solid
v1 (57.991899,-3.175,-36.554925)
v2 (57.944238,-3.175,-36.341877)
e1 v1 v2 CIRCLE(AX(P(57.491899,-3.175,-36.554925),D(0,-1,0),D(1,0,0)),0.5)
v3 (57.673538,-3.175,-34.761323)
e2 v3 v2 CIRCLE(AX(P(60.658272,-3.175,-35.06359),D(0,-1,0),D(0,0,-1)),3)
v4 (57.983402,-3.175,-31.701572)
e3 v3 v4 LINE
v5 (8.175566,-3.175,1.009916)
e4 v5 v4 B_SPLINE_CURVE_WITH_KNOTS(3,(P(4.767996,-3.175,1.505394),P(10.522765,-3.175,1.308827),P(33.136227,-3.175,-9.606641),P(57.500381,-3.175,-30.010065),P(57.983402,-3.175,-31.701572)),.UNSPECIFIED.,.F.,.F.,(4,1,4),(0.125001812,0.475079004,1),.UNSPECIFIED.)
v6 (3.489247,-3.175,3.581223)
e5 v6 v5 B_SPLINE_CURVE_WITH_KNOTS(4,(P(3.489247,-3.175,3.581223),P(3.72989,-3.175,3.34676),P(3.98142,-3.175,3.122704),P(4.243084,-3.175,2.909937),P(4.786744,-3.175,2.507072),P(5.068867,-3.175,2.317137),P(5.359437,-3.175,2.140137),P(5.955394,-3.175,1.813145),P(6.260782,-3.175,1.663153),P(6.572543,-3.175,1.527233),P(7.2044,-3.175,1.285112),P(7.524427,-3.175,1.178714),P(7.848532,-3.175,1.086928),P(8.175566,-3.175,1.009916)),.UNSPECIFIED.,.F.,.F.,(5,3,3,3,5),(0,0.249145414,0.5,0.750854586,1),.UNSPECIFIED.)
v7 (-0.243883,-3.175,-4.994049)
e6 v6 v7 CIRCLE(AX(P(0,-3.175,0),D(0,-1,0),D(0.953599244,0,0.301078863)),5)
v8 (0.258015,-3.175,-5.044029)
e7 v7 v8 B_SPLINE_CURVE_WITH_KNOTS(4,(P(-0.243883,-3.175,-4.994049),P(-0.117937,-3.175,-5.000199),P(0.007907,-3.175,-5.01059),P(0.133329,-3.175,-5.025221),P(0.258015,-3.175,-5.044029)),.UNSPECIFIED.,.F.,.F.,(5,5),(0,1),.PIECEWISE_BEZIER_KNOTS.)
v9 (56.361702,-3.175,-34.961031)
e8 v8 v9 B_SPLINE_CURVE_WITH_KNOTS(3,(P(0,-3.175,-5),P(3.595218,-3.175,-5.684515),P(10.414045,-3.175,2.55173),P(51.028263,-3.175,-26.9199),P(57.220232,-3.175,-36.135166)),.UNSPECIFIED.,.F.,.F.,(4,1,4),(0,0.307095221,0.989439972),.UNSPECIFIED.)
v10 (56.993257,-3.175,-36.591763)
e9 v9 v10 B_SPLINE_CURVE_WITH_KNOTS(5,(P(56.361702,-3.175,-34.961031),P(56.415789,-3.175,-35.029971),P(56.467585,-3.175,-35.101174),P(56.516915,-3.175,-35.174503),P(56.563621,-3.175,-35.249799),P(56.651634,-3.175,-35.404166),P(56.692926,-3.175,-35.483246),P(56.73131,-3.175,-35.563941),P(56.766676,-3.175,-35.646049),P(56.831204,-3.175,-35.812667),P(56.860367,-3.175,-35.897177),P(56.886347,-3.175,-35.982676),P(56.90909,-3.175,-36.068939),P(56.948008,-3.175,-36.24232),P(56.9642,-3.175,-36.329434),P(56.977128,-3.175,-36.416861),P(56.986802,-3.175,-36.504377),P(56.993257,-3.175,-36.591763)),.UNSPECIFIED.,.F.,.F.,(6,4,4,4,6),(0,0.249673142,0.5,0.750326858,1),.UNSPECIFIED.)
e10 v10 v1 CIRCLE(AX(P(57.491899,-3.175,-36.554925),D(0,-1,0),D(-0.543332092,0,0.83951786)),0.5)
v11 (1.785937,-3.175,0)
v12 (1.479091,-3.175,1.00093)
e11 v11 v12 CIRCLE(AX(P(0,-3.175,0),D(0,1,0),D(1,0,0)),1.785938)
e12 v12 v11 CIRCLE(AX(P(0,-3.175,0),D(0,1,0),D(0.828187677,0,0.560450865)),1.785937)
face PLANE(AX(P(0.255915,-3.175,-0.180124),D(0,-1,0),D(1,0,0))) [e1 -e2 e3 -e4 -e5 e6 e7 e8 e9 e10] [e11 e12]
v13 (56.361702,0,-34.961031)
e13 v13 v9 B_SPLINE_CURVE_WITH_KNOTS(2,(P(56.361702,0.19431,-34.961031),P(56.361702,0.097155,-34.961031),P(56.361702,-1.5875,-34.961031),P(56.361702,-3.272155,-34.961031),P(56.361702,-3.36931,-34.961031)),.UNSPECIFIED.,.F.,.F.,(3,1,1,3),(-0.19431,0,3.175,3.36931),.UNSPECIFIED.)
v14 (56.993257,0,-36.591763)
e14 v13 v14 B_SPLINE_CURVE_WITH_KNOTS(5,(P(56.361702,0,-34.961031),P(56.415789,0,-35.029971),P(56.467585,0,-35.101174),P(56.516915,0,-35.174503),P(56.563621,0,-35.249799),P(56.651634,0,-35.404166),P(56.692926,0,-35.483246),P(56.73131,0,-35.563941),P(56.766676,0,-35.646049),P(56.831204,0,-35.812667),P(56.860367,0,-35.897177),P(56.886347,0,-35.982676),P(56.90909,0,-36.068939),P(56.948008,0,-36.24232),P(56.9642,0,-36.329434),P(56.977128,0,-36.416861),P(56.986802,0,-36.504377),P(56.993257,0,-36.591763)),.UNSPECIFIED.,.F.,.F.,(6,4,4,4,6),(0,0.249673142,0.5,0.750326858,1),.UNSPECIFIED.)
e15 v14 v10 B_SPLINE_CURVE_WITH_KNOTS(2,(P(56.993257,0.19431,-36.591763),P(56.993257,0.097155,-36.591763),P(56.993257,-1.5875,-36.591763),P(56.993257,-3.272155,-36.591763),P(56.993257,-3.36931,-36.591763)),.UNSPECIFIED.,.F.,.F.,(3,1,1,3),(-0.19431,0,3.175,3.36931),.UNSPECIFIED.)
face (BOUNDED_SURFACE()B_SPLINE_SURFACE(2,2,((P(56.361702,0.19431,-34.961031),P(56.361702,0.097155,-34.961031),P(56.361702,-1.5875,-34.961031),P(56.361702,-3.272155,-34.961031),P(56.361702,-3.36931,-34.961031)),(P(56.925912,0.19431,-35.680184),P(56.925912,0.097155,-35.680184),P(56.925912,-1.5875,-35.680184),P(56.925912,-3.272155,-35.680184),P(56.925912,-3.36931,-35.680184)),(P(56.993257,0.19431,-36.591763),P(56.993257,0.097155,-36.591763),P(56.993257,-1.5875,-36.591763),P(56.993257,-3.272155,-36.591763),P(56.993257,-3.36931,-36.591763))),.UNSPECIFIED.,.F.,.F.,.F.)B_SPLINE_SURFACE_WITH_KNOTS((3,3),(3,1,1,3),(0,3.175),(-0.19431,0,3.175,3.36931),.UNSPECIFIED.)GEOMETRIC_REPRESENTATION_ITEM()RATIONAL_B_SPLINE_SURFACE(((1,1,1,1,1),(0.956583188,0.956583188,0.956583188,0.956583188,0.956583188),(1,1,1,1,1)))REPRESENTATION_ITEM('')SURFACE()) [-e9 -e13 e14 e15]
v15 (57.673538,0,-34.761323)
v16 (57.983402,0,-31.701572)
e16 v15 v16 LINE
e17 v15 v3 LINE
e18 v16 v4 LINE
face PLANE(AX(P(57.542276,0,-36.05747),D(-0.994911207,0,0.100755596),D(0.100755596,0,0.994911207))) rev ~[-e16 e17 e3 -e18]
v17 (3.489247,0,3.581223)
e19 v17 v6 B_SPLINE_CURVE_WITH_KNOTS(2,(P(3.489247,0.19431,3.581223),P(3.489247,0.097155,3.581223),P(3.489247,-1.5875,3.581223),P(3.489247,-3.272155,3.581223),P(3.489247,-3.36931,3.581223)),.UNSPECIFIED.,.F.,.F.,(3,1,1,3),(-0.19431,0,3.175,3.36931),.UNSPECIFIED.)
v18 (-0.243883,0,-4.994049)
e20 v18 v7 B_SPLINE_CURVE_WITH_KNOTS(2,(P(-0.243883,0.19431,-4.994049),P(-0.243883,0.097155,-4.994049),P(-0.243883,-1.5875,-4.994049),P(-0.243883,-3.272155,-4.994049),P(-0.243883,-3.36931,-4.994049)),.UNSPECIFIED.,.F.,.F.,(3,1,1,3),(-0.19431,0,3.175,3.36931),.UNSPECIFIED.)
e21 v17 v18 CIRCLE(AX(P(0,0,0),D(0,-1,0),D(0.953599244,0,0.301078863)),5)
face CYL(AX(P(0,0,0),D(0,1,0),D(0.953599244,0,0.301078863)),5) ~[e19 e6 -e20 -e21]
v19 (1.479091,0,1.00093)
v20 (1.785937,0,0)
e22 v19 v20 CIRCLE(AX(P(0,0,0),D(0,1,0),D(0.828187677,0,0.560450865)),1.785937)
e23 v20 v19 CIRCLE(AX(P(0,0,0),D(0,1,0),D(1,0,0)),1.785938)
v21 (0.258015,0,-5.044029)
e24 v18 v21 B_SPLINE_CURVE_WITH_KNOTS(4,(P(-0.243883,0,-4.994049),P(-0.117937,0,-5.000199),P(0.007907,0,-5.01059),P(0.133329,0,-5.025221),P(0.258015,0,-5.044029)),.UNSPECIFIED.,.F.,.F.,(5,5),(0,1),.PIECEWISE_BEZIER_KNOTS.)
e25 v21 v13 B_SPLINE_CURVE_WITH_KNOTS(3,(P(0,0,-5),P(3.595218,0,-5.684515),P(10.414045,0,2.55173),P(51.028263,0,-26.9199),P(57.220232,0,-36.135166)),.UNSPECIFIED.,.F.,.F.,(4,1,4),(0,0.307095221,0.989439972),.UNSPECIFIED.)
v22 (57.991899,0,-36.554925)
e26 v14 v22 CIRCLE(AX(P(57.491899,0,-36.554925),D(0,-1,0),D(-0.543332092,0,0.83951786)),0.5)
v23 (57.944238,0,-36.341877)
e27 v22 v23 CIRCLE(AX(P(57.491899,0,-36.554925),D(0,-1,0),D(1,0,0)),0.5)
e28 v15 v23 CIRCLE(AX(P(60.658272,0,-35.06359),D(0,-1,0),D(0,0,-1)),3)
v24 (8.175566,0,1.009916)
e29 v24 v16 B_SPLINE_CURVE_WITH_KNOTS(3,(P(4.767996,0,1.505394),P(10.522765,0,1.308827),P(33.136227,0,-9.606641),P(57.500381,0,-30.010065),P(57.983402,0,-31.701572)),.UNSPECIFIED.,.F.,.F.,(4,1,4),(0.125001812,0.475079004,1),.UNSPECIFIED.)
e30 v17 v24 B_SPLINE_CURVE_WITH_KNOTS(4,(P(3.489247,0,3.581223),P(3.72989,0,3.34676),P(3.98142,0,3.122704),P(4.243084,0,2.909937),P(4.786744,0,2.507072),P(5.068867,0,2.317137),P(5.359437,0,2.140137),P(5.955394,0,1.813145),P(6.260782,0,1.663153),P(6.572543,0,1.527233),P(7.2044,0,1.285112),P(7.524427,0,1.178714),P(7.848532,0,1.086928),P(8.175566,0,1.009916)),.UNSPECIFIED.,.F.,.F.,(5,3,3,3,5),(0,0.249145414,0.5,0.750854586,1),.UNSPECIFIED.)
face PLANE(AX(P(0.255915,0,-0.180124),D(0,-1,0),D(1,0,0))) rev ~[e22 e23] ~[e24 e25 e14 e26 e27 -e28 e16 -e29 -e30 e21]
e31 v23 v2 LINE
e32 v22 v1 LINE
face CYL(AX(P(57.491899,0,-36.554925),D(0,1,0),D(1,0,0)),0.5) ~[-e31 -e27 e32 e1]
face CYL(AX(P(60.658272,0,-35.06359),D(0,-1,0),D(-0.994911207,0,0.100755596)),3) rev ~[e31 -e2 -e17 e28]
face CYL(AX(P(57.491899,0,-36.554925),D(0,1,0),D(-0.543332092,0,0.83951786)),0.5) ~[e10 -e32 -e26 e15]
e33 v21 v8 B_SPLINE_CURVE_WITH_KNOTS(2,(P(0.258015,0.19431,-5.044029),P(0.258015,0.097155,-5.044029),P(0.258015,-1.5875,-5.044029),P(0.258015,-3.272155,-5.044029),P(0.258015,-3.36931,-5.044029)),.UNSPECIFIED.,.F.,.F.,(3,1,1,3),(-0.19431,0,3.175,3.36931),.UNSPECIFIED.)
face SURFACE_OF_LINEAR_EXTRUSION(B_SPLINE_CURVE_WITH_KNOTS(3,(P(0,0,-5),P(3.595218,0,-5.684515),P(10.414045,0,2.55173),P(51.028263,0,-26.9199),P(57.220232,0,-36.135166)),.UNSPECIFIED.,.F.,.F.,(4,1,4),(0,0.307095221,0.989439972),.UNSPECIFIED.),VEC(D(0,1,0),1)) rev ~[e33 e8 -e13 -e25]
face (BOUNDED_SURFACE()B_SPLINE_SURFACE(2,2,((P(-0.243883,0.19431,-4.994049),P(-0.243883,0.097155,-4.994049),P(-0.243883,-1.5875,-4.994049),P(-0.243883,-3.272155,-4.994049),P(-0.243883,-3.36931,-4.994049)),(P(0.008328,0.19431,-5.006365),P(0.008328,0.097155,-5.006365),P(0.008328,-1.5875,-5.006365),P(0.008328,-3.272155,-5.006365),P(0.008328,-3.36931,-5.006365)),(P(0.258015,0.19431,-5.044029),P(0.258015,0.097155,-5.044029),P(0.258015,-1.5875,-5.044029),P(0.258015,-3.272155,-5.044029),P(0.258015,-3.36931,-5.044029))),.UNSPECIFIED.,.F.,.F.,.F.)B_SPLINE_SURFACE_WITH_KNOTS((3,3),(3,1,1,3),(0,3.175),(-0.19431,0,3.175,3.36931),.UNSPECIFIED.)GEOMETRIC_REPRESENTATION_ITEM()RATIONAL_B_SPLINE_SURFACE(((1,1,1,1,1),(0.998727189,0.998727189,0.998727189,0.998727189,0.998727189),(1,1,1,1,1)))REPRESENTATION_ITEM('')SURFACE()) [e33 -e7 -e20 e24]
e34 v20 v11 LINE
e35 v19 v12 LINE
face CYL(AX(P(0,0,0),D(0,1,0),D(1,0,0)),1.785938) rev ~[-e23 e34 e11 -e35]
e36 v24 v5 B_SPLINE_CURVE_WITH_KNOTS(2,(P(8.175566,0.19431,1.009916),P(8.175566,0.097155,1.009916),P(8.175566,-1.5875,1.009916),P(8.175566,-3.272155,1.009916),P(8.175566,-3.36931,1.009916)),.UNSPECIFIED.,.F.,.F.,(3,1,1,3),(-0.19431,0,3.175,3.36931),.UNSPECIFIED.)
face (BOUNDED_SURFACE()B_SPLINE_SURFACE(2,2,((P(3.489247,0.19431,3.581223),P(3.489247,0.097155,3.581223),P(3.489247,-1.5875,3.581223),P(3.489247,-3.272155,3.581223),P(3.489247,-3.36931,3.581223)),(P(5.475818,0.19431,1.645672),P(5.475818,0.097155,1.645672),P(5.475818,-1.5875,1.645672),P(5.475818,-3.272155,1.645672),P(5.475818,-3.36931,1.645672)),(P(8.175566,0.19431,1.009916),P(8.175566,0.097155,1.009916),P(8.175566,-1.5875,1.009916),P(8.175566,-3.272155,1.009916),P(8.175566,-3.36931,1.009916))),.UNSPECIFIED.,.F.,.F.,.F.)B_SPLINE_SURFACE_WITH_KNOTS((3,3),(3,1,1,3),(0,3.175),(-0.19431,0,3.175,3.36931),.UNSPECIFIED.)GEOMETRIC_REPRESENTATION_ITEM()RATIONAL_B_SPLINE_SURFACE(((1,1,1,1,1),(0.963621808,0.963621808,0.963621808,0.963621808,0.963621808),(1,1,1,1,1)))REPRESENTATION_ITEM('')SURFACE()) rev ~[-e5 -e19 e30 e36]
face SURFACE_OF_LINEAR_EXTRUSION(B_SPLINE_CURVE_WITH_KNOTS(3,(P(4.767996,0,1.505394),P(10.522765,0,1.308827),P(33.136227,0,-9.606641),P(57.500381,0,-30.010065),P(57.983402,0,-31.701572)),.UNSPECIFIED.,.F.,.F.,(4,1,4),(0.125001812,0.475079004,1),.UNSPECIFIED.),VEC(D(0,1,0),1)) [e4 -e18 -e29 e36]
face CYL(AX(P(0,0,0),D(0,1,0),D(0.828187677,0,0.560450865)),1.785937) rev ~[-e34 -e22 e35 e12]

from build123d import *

# Parameters (mm, degrees)
F1_DEPTH = 3.175
F2_R     = 10
F3_R     = 5
F4_R     = 3


# Not quite as in the source:
# - a length typed as a fraction of an inch, garbled in the dataset ("3 / 203.2 mm" for 3/8 in), is restored


with BuildPart() as f1:
    # F0 (on Front) → F1 (new body)
    with BuildSketch(Plane.XZ):
        with BuildLine():
            ThreePointArc((5, 0), (4.9416586843, 0.7615835135), (4.7679962208, 1.5053943132))
            ThreePointArc((4.7679962208, 1.5053943132), (-4.0328012328, 2.9557594992), (0, -5))
            ThreePointArc((0, -5), (3.5355339059, -3.5355339059), (5, 0))
        make_face()
        with BuildLine():
            ThreePointArc((1.4790914289, 1.0009302168), (1.7075036754, 0.5234538686), (1.7859375, 0))
            ThreePointArc((1.7859375, 0), (-1.7075036754, -0.5234538686), (1.4790914289, 1.0009302168))
        make_face(mode=Mode.SUBTRACT)
        with BuildLine():
            add(Edge.make_bspline(
                [(4.7679962208, 1.5053943132), (10.5227651302, 1.3088265612), (33.1362274433, -9.6066408427), (57.5003811193, -30.0100648608), (57.9834021628, -31.7015722394)],
                knots=[0.1250018118, 0.1250018118, 0.1250018118, 0.1250018118, 0.4750790038, 1, 1, 1, 1], degree=3))
            ThreePointArc((4.7679962208, 1.5053943132), (4.9416586843, 0.7615835135), (5, 0))
            ThreePointArc((5, 0), (3.5355339059, -3.5355339059), (0, -5))
            add(Edge.make_bspline(
                [(0, -5), (3.595217635, -5.6845152728), (10.4140448254, 2.5517302892), (51.028263127, -26.9198999285), (57.2202324906, -36.1351662136)],
                knots=[0, 0, 0, 0, 0.3070952206, 0.9894399722, 0.9894399722, 0.9894399722, 0.9894399722], degree=3))
            ThreePointArc((57.2202324906, -36.1351662136), (57.3746325338, -36.0688709445), (57.5422763348, -36.0574695402))
            Line((57.5422763348, -36.0574695402), (57.9834021628, -31.7015722394))
        make_face()
        with BuildLine():
            ThreePointArc((57.5422763348, -36.0574695402), (57.3746325338, -36.0688709445), (57.2202324906, -36.1351662136))
            add(Edge.make_bspline(
                [(57.2202324906, -36.1351662136), (57.316059957, -36.2777824909), (57.40666212, -36.4177380179), (57.4918985367, -36.5549251437)],
                knots=[0.9894399722, 0.9894399722, 0.9894399722, 0.9894399722, 1, 1, 1, 1], degree=3))
            Line((57.4918985367, -36.5549251437), (57.5422763348, -36.0574695402))
        make_face()
        with BuildLine():
            add(Edge.make_bspline(
                [(57.2202324906, -36.1351662136), (57.316059957, -36.2777824909), (57.40666212, -36.4177380179), (57.4918985367, -36.5549251437)],
                knots=[0.9894399722, 0.9894399722, 0.9894399722, 0.9894399722, 1, 1, 1, 1], degree=3))
            ThreePointArc((57.2202324906, -36.1351662136), (57.2529770255, -36.9941477655), (57.9918985367, -36.5549251437))
            ThreePointArc((57.9918985367, -36.5549251437), (57.8628357949, -36.2196557737), (57.5422763348, -36.0574695402))
            Line((57.5422763348, -36.0574695402), (57.4918985367, -36.5549251437))
        make_face()
    extrude(amount=F1_DEPTH)

    # F2
    f2_edges = [f1.edges().sort_by_distance(p)[0] for p in [
        (4.767996, -1.5875, 1.505394),
    ]]
    fillet(f2_edges, radius=F2_R)

    # F3
    f3_edges = [f1.edges().sort_by_distance(p)[0] for p in [
        (0, -1.5875, -5),
    ]]
    fillet(f3_edges, radius=F3_R)

    # F4
    f4_edges = [f1.edges().sort_by_distance(p)[0] for p in [
        (57.542276, -1.5875, -36.05747),
        (57.220232, -1.5875, -36.135166),
    ]]
    fillet(f4_edges, radius=F4_R)


solid = f1.part
